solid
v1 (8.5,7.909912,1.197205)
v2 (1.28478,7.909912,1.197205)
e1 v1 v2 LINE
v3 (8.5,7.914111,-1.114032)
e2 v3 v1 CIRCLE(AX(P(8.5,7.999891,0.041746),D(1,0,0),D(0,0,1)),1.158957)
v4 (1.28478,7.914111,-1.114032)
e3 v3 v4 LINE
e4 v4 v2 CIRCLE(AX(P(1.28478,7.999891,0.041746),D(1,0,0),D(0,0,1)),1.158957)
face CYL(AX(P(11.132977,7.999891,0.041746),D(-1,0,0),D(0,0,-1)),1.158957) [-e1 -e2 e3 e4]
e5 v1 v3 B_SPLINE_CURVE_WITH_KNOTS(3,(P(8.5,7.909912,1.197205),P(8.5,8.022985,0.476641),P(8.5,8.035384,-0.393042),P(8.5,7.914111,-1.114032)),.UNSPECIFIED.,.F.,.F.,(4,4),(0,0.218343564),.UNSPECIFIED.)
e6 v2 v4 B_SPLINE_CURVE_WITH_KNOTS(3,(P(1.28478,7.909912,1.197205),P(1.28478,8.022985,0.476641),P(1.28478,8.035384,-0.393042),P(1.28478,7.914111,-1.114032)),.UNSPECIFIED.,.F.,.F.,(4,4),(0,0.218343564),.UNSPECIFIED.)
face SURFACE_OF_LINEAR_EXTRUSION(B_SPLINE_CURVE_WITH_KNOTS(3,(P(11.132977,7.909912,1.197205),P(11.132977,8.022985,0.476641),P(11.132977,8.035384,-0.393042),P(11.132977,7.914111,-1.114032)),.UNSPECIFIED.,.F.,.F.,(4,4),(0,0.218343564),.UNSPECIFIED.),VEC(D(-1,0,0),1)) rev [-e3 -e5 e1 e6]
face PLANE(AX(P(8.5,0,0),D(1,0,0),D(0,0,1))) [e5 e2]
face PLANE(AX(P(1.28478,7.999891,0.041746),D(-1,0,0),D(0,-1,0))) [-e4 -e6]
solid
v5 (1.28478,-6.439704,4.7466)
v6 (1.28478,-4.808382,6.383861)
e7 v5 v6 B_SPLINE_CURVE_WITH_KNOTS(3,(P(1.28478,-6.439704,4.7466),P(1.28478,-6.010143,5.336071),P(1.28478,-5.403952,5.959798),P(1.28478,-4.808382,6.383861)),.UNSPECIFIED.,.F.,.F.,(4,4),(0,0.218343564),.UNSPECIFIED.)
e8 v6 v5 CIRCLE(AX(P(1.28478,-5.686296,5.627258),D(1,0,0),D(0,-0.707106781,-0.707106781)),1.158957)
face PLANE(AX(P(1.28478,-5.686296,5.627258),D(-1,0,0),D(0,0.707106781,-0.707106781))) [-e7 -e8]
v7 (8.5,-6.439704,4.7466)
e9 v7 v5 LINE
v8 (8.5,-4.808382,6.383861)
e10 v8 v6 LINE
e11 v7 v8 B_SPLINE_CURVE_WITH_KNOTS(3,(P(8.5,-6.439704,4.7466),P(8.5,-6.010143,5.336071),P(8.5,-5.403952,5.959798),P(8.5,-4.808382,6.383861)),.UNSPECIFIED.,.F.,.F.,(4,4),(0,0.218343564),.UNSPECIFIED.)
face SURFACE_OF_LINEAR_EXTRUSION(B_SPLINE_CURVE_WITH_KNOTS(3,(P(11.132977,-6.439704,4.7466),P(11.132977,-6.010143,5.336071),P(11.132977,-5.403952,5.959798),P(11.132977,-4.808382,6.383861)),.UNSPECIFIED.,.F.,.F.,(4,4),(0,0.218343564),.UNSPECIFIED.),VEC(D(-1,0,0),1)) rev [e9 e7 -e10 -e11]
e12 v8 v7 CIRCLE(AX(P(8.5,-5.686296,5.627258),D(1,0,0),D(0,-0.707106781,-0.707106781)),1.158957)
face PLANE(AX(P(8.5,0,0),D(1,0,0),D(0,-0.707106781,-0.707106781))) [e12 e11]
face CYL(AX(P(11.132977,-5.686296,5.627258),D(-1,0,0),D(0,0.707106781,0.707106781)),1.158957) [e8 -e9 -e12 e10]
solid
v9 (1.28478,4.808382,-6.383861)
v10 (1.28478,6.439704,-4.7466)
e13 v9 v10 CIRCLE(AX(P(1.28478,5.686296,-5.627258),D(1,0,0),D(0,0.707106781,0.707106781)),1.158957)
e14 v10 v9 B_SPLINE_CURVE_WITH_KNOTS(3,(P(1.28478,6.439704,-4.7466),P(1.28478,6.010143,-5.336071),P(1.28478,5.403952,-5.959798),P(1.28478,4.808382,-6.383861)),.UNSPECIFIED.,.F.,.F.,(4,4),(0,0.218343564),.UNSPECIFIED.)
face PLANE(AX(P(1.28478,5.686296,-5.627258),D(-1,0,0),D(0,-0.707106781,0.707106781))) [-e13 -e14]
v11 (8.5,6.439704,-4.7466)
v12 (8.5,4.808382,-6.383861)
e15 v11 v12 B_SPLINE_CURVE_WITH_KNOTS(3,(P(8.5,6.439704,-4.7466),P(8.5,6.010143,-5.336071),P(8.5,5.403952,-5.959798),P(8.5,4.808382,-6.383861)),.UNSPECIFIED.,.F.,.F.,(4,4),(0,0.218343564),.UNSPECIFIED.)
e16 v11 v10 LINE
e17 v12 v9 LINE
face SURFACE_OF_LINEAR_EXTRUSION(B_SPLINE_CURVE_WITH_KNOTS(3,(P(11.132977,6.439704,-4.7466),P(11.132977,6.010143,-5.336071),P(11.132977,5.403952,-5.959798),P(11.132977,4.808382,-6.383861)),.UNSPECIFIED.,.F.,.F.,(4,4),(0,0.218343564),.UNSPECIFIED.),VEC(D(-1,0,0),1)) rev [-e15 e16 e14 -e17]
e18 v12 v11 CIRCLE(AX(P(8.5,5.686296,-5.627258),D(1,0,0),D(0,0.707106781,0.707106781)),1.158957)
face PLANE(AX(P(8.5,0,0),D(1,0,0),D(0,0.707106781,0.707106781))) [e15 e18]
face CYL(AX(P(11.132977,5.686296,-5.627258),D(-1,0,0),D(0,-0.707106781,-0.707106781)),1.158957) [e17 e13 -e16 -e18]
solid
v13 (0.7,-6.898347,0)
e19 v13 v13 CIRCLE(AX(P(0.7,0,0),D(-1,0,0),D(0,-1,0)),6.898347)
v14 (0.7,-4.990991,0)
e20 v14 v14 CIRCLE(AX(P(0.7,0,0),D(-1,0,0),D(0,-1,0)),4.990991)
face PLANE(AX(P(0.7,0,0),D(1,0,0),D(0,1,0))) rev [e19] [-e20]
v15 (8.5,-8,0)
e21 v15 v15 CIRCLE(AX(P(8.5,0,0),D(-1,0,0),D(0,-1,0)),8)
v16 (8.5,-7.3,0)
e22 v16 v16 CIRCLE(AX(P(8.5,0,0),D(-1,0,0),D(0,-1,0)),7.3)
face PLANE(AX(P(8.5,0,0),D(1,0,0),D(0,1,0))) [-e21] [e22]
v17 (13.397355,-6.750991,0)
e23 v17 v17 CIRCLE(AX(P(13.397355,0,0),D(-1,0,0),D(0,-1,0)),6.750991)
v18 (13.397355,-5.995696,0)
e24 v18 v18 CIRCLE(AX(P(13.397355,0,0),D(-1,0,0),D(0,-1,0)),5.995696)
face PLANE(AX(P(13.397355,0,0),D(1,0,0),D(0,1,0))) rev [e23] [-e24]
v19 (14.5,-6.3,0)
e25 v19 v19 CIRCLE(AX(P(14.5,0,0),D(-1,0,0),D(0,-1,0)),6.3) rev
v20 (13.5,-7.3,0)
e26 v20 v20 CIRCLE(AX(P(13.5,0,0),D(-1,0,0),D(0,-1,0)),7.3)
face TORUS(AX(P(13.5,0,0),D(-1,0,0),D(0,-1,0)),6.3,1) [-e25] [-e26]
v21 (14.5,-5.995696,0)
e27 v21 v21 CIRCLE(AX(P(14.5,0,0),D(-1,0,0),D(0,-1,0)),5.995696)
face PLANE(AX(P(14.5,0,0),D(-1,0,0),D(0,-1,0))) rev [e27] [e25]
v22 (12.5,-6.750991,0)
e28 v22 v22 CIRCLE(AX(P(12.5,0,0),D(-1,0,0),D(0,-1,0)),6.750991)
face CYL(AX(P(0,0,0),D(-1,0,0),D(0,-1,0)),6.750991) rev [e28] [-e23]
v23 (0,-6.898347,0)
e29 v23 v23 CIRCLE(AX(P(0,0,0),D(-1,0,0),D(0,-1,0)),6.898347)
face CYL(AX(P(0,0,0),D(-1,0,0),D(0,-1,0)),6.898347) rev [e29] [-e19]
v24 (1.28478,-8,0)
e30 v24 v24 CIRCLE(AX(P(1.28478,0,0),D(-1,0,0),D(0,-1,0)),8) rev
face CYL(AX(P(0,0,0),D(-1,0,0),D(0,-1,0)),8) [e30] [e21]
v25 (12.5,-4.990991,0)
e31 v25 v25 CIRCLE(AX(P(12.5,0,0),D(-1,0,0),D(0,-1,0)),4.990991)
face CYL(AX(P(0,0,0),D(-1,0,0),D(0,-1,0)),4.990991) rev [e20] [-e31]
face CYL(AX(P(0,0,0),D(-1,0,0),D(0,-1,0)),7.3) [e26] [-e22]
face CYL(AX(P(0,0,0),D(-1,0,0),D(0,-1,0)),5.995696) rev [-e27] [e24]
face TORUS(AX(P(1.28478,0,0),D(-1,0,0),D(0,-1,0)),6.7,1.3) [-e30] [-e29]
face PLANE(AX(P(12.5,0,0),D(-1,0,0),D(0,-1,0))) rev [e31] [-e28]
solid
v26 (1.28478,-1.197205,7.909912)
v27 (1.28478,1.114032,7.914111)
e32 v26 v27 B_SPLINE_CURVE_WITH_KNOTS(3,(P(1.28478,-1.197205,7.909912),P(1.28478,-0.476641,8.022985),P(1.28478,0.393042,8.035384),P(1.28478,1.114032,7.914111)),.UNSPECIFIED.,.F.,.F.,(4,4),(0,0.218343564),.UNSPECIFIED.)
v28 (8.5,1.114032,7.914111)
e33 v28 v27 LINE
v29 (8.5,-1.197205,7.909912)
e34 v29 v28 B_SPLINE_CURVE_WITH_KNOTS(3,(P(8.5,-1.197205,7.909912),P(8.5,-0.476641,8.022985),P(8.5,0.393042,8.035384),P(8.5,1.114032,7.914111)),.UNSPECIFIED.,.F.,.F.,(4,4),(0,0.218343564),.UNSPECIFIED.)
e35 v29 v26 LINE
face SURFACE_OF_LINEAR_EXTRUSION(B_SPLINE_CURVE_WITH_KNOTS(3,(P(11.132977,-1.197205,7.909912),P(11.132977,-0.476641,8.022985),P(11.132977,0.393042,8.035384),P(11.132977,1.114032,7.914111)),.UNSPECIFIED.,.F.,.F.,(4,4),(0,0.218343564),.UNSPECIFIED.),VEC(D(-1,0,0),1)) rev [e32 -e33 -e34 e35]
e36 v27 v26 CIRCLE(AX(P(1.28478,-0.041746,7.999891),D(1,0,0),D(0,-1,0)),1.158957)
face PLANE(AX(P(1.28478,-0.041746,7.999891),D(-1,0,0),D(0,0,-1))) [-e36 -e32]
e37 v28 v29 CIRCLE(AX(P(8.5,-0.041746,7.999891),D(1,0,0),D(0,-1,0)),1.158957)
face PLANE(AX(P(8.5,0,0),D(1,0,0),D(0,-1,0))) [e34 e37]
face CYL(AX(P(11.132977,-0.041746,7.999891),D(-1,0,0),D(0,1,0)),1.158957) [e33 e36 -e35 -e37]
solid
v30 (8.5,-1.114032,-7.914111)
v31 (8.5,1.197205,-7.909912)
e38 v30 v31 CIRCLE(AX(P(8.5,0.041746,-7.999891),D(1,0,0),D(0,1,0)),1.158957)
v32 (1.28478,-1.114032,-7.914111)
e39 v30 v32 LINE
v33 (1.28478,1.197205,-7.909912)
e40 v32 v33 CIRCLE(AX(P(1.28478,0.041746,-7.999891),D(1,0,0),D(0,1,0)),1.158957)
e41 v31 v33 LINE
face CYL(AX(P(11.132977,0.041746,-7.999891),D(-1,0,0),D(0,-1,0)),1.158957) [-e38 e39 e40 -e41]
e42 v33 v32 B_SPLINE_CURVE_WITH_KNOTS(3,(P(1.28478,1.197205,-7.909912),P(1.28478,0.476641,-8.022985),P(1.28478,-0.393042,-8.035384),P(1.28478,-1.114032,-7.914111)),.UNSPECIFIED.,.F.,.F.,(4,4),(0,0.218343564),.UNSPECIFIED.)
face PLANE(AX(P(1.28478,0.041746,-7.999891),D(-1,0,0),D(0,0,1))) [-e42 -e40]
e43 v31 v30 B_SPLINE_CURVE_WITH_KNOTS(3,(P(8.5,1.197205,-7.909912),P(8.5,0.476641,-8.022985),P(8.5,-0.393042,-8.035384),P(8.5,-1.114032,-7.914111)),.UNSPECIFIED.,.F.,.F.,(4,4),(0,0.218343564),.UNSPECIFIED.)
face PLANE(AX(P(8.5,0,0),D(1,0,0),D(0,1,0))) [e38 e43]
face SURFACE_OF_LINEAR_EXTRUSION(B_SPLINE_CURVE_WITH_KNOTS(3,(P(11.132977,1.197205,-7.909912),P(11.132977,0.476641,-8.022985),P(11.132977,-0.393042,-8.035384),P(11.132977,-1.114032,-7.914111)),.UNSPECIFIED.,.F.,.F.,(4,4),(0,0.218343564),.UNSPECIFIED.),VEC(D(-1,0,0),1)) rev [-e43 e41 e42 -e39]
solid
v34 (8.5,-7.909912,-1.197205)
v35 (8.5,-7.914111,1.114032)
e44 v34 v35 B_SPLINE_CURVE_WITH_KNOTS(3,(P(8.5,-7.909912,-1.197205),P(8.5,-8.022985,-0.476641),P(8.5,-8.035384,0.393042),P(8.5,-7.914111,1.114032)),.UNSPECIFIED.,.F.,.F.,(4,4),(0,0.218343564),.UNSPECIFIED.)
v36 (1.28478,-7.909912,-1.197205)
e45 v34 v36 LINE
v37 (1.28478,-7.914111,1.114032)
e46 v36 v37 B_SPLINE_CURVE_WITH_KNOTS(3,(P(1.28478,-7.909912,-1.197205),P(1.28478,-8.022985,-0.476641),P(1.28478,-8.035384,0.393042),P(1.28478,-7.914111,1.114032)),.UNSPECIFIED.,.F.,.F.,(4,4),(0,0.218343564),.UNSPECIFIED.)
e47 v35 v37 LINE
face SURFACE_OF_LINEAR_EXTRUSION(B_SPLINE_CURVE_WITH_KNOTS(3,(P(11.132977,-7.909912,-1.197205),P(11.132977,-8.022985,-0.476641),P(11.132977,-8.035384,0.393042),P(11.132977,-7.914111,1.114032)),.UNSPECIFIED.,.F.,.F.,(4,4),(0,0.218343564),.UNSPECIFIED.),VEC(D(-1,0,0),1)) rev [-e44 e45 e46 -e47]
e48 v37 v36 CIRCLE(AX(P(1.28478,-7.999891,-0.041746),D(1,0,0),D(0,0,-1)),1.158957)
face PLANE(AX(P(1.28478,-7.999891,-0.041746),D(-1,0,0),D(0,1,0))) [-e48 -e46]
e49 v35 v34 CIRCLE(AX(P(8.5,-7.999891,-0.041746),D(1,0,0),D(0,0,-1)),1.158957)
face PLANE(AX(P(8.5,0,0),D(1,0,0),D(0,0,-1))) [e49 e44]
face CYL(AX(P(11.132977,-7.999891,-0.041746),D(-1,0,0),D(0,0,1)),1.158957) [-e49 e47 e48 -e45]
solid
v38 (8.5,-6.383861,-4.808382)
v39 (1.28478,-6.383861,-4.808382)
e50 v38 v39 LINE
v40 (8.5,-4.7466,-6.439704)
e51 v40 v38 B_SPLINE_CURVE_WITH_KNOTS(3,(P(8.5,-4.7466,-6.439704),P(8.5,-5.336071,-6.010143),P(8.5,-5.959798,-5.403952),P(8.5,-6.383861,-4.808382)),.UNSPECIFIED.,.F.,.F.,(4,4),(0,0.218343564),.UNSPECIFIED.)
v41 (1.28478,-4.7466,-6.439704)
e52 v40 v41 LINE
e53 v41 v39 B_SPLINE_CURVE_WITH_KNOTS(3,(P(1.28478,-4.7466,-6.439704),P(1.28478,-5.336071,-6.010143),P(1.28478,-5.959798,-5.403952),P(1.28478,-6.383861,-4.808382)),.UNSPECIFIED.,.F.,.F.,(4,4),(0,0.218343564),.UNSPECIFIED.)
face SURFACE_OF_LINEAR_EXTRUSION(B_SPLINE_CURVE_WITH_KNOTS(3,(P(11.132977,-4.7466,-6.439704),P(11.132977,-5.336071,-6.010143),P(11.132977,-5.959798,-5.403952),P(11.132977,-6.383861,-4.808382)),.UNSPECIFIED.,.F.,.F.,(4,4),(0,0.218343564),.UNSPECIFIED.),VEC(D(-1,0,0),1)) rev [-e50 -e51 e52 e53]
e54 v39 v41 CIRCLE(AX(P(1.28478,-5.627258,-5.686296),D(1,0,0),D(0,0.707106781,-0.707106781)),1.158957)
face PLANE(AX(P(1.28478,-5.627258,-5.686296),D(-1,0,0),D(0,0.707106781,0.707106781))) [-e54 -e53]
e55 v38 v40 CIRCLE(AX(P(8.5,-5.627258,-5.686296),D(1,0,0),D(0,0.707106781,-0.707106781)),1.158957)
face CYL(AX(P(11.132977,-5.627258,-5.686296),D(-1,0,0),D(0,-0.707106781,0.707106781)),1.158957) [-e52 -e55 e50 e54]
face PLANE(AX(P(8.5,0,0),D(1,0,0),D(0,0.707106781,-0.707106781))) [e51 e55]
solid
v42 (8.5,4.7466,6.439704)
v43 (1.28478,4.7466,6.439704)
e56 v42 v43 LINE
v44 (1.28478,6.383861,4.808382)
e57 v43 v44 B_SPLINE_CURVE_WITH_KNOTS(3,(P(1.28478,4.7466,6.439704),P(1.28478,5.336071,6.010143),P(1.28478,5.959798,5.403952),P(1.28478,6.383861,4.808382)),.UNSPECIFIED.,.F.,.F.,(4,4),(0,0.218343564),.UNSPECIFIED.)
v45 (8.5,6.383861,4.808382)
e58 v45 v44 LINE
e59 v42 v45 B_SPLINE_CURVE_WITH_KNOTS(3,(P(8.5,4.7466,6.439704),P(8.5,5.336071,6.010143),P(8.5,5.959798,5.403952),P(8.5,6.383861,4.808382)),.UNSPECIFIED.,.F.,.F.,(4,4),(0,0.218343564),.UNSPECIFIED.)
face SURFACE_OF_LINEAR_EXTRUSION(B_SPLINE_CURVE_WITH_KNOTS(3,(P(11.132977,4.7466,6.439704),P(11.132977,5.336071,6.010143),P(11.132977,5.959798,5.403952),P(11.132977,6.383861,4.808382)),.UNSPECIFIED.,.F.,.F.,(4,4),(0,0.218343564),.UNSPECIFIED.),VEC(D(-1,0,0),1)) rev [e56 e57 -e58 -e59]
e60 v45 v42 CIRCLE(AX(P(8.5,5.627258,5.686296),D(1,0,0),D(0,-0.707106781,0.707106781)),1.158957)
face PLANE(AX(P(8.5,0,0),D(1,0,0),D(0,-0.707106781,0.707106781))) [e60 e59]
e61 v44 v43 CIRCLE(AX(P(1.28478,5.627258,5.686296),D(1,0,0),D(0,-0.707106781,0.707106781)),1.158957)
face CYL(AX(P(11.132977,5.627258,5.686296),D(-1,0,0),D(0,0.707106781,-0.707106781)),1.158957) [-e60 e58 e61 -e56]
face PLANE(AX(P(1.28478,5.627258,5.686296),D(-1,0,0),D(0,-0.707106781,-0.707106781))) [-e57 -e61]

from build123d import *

# Parameters (mm, degrees)
FILLET_3_R               = 1.3
FILLET_4_R               = 1
EXTRUDE_5_DEPTH          = 7.215220421
PATTERN_CIRCULAR_2_COUNT = 8


with BuildPart() as part:
    # Эскиз2 → Повернуть1 (revolve)
    with BuildSketch(Plane.XY, mode=Mode.PRIVATE) as revolve_1_sk:
        Polygon((0, 8), (0, 6.898346752), (0.7, 6.898346752), (0.7, 4.990991269), (12.5, 4.990991269), (12.5, 6.750991269), (13.39735467, 6.750991269), (13.39735467, 5.995695632), (14.5, 5.995695632), (14.5, 6.265355114), (14.5, 7.3), (8.5, 7.3), (8.5, 8), align=None)
    revolve(revolve_1_sk.sketch.rotate(Axis((0, 0, 0), (1, 0, 0)), 180), axis=Axis((0, 0, 0), (1, 0, 0)))

    # Скругление3
    # the kernel refuses this fillet: 1.3 mm, written as the material it takes off along each edge
    with BuildSketch(Plane(origin=(0, 0, 0), x_dir=(0, -1, 0), z_dir=(0, 0, 1))) as fillet_3_piece_1:
        with BuildLine():
            CenterArc((6.7, 1.284779579), FILLET_3_R, 278.77614781, 81.22385219)
            Line((8, 1.284779579), (8.026, 1.284779579))
            Line((8.026, 1.284779579), (8.026, 0))
            Line((8.026, 0), (8, -0.026))
            ThreePointArc((8, -0.026), (7.449173376, -0.026), (6.902313687, -0.025695592))
            Line((6.902313687, -0.025695592), (6.898346752, 0))
        make_face()
    revolve(axis=Axis((0, 0, 0), (1, 0, 0)), mode=Mode.SUBTRACT)

    # Скругление4
    fillet_4_edges = [part.edges().sort_by_distance(p)[0] for p in [
        (14.5, 7.3, 0),
    ]]
    fillet(fillet_4_edges, radius=FILLET_4_R)


with BuildPart() as body_2:
    # Эскиз5 → Бобышка-Вытянуть5 (new body)
    with BuildSketch(Plane(origin=(1.284779579, 0, 0), x_dir=(0, 0, -1), z_dir=(1, 0, 0))):
        with BuildLine():
            ThreePointArc((7.914111034, -1.114031771), (9.158845977, 0.043851987), (7.909911549, 1.197204782))
            add(Edge.make_bspline(
                [(7.914111034, -1.114031771), (8.035384164, -0.393042361), (8.022984515, 0.476641176), (7.909911549, 1.197204782)],
                knots=[0, 0, 0, 0, 0.218343564, 0.218343564, 0.218343564, 0.218343564], degree=3))
        make_face()
    extrude(amount=EXTRUDE_5_DEPTH)


with BuildPart() as pattern_circular_2_1:
    # Круговой массив2: pattern copy
    add(body_2.part.rotate(Axis((1.284779579, 0, 0), (-1, 0, 0)), 1 * 360 / PATTERN_CIRCULAR_2_COUNT))


with BuildPart() as pattern_circular_2_2:
    # Круговой массив2: pattern copy
    add(body_2.part.rotate(Axis((1.284779579, 0, 0), (-1, 0, 0)), 2 * 360 / PATTERN_CIRCULAR_2_COUNT))


with BuildPart() as pattern_circular_2_3:
    # Круговой массив2: pattern copy
    add(body_2.part.rotate(Axis((1.284779579, 0, 0), (-1, 0, 0)), 3 * 360 / PATTERN_CIRCULAR_2_COUNT))


with BuildPart() as pattern_circular_2_4:
    # Круговой массив2: pattern copy
    add(body_2.part.rotate(Axis((1.284779579, 0, 0), (-1, 0, 0)), 4 * 360 / PATTERN_CIRCULAR_2_COUNT))


with BuildPart() as pattern_circular_2_5:
    # Круговой массив2: pattern copy
    add(body_2.part.rotate(Axis((1.284779579, 0, 0), (-1, 0, 0)), 5 * 360 / PATTERN_CIRCULAR_2_COUNT))


with BuildPart() as pattern_circular_2_6:
    # Круговой массив2: pattern copy
    add(body_2.part.rotate(Axis((1.284779579, 0, 0), (-1, 0, 0)), 6 * 360 / PATTERN_CIRCULAR_2_COUNT))


with BuildPart() as pattern_circular_2_7:
    # Круговой массив2: pattern copy
    add(body_2.part.rotate(Axis((1.284779579, 0, 0), (-1, 0, 0)), 7 * 360 / PATTERN_CIRCULAR_2_COUNT))


solid = Compound([part.part, body_2.part, pattern_circular_2_1.part, pattern_circular_2_2.part, pattern_circular_2_3.part, pattern_circular_2_4.part, pattern_circular_2_5.part, pattern_circular_2_6.part, pattern_circular_2_7.part])
